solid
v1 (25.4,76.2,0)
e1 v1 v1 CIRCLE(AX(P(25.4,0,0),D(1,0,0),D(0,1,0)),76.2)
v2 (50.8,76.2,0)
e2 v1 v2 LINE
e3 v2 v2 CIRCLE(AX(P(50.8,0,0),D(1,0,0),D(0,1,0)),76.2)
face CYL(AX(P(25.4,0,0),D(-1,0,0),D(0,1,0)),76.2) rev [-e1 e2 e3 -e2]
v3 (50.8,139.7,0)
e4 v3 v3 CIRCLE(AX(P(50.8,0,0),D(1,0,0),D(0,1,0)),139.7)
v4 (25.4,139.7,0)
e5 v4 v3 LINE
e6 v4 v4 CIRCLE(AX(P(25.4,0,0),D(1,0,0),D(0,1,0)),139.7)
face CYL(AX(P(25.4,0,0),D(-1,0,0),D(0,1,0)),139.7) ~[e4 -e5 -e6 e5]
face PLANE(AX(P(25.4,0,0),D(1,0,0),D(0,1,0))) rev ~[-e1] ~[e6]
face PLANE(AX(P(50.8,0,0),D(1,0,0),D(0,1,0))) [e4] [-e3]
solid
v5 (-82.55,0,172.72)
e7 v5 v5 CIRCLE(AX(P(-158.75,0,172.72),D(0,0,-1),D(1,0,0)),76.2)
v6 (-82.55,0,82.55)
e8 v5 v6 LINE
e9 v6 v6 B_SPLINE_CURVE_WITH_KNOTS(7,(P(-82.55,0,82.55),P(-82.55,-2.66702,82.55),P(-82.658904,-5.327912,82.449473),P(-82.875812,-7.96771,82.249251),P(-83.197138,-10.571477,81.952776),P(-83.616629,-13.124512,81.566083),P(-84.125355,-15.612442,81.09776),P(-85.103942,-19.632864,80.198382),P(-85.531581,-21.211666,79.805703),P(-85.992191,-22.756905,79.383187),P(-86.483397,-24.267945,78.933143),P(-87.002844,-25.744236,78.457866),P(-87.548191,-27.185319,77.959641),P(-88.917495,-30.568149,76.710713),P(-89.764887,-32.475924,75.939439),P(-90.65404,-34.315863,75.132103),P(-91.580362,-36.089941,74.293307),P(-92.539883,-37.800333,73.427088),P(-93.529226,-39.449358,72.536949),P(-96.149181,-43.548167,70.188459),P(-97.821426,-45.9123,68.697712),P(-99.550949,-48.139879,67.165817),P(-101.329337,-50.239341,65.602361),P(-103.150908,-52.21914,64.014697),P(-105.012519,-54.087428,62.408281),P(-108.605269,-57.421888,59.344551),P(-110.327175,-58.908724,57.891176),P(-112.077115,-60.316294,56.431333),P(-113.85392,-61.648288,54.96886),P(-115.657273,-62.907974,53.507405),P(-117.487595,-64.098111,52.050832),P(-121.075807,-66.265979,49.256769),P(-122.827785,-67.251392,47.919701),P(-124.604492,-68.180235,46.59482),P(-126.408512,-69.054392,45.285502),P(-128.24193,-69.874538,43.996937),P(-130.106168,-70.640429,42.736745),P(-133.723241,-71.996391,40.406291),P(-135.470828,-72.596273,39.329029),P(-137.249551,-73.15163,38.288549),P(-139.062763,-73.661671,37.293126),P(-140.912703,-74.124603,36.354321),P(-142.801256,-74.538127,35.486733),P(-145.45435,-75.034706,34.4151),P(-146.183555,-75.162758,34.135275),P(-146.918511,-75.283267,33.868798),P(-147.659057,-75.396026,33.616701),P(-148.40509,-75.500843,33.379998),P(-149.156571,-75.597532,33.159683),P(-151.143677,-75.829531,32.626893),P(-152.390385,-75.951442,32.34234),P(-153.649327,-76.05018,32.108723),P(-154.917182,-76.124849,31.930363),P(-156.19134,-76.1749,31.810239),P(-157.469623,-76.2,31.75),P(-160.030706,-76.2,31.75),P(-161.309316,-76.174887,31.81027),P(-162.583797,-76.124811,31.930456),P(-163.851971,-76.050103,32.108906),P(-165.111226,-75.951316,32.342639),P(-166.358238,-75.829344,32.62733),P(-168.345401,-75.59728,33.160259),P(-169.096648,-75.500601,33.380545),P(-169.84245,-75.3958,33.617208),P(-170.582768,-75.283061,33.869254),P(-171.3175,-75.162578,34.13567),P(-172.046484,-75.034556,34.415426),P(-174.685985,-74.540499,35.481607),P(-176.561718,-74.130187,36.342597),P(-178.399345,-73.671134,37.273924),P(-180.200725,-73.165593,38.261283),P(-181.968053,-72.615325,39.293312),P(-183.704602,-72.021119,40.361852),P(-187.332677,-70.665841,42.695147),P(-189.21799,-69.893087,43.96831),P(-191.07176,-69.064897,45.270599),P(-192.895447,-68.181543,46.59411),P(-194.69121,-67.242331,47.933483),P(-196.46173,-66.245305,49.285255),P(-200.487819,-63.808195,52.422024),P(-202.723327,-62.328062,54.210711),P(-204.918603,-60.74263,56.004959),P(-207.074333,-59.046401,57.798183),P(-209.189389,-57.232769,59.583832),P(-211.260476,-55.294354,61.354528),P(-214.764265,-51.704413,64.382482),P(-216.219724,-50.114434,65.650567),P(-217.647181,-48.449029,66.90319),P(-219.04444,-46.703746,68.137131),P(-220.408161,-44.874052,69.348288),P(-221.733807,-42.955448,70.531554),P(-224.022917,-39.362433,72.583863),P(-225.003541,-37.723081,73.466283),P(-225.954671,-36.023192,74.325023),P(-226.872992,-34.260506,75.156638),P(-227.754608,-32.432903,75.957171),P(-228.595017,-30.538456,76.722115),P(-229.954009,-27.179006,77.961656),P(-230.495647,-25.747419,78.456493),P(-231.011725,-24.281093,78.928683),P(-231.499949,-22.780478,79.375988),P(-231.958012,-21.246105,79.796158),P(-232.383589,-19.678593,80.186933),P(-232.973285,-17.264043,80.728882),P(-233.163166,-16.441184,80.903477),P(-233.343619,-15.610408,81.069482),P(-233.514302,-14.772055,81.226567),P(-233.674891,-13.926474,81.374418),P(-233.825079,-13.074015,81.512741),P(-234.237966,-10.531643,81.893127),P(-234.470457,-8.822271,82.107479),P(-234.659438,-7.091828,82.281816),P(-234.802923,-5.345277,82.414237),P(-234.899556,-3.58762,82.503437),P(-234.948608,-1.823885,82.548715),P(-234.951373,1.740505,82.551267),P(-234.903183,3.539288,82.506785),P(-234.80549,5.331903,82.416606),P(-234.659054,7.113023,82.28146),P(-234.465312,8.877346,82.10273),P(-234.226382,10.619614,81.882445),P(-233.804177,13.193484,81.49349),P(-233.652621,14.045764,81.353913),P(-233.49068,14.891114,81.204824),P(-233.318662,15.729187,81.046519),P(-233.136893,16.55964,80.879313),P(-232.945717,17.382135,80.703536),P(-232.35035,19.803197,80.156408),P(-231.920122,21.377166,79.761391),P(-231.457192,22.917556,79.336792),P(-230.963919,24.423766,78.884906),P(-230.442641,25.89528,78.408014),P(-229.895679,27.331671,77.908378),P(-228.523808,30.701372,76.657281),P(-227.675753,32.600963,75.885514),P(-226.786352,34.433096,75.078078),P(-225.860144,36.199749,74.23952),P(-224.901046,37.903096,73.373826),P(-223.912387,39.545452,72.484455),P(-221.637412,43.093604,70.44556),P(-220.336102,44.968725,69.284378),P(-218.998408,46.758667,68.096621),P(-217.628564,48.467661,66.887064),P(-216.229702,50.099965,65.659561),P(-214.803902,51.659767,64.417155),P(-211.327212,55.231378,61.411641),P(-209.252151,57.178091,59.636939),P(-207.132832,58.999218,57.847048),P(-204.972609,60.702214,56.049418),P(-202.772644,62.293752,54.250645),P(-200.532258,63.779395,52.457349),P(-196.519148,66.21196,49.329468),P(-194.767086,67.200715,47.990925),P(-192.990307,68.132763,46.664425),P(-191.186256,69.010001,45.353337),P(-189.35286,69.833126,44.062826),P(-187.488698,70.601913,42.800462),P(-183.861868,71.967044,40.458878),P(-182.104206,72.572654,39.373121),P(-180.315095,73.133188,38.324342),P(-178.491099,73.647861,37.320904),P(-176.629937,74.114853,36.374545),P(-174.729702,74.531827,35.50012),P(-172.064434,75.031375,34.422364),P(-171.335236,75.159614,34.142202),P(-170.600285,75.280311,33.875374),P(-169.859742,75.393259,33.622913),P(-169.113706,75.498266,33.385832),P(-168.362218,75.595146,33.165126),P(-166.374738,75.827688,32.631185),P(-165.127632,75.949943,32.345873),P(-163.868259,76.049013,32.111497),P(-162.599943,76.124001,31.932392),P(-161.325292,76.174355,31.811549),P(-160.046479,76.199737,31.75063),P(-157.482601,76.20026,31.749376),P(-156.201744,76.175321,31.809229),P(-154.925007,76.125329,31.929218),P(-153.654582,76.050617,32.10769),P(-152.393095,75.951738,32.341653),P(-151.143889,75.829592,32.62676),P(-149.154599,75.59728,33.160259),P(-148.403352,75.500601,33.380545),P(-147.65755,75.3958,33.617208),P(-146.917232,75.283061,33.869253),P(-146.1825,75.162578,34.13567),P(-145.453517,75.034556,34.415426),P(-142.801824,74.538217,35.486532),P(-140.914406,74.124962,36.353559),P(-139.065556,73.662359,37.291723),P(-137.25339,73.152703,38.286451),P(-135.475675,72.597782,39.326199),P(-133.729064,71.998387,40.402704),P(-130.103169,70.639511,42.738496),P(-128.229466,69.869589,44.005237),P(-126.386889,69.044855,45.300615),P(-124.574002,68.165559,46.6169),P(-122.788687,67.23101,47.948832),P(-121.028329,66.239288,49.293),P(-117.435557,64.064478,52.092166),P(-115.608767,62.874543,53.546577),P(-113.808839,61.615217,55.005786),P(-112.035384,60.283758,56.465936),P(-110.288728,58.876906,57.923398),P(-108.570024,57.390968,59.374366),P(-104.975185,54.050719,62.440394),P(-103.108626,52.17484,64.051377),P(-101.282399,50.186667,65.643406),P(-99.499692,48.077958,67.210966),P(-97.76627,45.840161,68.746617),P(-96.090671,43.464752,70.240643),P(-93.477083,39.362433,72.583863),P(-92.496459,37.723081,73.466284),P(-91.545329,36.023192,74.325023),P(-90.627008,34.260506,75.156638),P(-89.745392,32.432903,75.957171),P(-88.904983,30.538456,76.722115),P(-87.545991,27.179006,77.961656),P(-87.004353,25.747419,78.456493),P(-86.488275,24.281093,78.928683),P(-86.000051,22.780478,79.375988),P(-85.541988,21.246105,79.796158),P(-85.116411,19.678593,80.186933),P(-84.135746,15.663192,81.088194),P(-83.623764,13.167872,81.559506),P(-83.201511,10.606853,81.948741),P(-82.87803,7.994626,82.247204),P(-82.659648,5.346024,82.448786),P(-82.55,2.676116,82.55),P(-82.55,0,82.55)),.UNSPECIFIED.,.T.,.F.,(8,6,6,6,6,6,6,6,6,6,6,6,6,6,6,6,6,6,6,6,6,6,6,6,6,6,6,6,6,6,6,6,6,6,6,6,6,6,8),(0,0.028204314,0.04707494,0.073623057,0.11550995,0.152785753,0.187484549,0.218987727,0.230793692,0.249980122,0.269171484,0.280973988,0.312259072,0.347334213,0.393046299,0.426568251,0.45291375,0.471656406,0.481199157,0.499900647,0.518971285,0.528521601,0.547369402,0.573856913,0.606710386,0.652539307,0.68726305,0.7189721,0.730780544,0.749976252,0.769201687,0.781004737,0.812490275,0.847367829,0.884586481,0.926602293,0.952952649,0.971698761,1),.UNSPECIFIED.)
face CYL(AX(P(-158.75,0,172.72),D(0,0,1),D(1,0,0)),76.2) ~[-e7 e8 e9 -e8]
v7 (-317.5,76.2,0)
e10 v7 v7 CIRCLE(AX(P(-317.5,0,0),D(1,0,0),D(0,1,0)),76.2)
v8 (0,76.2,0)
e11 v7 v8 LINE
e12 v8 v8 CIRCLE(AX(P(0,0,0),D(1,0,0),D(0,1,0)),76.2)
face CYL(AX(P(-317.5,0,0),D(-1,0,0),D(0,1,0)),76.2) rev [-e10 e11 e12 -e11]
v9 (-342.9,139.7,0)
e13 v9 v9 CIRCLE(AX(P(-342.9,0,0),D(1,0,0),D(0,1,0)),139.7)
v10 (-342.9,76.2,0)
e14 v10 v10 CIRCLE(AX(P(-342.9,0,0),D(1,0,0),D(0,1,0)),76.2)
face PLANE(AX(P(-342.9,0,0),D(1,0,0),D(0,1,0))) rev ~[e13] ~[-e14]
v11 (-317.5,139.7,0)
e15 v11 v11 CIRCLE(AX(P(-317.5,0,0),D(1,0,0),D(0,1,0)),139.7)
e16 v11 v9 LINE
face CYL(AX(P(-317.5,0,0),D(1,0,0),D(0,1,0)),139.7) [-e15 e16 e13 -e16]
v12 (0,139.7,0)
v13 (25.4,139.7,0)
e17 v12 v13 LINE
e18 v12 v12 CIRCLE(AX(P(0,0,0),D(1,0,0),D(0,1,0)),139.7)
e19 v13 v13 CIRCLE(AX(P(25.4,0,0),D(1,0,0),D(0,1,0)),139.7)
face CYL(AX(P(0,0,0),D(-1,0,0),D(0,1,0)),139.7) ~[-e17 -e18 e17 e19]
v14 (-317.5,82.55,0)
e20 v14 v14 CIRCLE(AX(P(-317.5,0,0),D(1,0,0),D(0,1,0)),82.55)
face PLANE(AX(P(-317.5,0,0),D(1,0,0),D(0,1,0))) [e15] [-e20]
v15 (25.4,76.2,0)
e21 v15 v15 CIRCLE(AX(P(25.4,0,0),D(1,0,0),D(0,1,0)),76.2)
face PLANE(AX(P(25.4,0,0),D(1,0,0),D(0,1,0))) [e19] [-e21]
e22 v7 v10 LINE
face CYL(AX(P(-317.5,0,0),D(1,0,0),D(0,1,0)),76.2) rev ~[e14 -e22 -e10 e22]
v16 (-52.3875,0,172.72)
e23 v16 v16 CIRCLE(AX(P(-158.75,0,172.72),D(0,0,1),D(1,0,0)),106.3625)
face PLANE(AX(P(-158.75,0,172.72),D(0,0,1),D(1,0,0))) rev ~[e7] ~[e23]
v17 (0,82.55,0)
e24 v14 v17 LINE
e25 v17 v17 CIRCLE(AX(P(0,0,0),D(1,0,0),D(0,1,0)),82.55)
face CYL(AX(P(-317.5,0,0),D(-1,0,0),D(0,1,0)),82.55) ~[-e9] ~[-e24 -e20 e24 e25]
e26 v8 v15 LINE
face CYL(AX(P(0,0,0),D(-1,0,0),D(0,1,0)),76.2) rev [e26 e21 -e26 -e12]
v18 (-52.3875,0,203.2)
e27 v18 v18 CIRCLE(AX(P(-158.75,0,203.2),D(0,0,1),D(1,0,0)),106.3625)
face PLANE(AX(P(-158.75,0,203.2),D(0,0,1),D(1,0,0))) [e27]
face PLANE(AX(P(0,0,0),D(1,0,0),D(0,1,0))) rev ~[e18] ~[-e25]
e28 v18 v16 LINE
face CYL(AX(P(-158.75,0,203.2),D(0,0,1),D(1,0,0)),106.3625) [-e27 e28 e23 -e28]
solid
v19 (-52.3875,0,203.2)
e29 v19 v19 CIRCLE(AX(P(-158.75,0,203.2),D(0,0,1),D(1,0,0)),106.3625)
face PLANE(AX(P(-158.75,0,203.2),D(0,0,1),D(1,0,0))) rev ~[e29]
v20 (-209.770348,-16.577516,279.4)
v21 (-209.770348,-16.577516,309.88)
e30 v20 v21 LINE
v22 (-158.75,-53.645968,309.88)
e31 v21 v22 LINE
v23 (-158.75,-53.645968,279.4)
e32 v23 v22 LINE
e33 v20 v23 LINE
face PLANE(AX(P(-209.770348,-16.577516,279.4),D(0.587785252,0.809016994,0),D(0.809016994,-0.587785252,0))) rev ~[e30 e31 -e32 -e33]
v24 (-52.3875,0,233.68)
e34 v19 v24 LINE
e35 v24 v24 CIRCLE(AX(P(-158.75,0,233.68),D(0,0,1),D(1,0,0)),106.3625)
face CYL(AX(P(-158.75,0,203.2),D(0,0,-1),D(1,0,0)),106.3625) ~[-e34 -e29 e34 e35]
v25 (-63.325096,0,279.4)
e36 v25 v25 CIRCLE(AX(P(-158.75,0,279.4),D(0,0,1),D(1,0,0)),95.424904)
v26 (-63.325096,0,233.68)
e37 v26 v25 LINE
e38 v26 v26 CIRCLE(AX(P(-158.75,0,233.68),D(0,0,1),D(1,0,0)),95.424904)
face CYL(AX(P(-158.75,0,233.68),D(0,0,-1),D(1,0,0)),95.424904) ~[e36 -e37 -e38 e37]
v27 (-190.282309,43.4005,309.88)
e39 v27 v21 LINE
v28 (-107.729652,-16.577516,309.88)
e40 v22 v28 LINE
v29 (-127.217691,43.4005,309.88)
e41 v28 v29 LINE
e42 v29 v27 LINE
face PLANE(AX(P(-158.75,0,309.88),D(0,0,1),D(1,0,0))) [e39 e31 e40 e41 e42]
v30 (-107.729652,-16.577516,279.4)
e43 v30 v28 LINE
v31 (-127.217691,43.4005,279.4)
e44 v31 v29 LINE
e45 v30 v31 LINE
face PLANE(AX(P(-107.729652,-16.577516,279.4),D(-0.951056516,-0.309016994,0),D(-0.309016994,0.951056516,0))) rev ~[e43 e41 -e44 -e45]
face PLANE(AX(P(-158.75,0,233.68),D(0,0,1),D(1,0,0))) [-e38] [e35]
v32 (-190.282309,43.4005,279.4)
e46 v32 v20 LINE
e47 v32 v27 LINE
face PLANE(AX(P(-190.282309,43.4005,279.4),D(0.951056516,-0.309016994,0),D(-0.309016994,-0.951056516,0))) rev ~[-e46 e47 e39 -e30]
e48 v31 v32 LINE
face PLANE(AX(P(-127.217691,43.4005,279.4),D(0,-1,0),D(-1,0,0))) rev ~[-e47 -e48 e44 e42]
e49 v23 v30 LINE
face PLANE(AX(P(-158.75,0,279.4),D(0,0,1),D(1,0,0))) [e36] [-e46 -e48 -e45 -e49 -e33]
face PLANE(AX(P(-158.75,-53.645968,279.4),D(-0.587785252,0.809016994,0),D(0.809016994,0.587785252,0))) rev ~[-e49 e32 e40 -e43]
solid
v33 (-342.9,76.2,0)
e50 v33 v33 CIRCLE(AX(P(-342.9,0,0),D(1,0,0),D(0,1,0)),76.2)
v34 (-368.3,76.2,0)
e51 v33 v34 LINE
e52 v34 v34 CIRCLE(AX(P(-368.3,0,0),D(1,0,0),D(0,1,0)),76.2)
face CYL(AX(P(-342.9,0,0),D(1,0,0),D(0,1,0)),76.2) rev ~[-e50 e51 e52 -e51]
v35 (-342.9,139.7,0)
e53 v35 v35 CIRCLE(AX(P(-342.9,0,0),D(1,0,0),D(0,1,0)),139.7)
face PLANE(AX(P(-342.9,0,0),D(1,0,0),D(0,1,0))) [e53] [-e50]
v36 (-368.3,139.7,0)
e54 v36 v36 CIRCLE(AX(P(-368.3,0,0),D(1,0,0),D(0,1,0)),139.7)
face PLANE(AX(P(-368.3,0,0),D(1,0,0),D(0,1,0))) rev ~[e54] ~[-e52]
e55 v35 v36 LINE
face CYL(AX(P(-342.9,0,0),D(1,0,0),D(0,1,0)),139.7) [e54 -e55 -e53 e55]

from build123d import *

# Parameters (mm, degrees)
F0_R      = 139.7
F0_R_2    = 76.2
F1_DEPTH  = 25.4
F3_R      = 139.7
F3_R_2    = 76.2
F4_DEPTH  = 25.4
F6_DEPTH  = 25.4
F7_DEPTH  = 25.4
F9_R      = 82.55
F9_R_2    = 76.2
F10_DEPTH = 317.5
F12_R     = 106.3625
F13_DEPTH = 30.48
F14_R     = 76.2
F15_REACH = 527.9471469057
F16_DEPTH = 30.48
F17_R     = 95.4249040927
F18_DEPTH = 45.72
F20_DEPTH = 30.48


with BuildPart() as f1:
    # F0 (on Right) → F1 (new body)
    with BuildSketch(Plane.YZ):
        Circle(F0_R)
        Circle(F0_R_2, mode=Mode.SUBTRACT)
    extrude(amount=F1_DEPTH)


with BuildPart() as f4:
    # F3 (on offset) → F4 (new body)
    with BuildSketch(Plane.YZ.offset(-317.5)):
        Circle(F3_R)
        Circle(F3_R_2, mode=Mode.SUBTRACT)
    extrude(amount=-F4_DEPTH)


with BuildPart() as f6:
    # F6 (new): a face of the model
    f6_faces = [f4.part.faces().sort_by_distance(p)[0] for p in [
        (-342.9, -135.7486873067, 0),
    ]]
    extrude(f6_faces, amount=F6_DEPTH)


with BuildPart() as f7:
    # F7 (new): a face of the model
    f7_faces = [f1.part.faces().sort_by_distance(p)[0] for p in [
        (25.4, -135.7486873067, 0),
    ]]
    extrude(f7_faces, amount=F7_DEPTH)


with BuildPart() as f1_1:
    add(f1.part)

    add(f4.part)  # F10 merges F4
    # F9 (on face) → F10 (join, through all)
    with BuildSketch(Plane.YZ.offset(-317.5)):
        Circle(F9_R)
        Circle(F9_R_2, mode=Mode.SUBTRACT)
    extrude(amount=F10_DEPTH)



with BuildPart() as f13:
    # F12 (on offset) → F13 (new body)
    with BuildSketch(Plane.XY.offset(203.2)):
        with Locations((-158.75, 0)):
            Circle(F12_R)
    extrude(amount=-F13_DEPTH)


with BuildPart() as f1_2:
    add(f1_1.part)

    add(f13.part)  # F15 merges F13
    f15_end = f1_2.faces().sort_by_distance((-158.75, -82.55, 0))[0]
    # F14 (on face) → F15 (join, up to a face of the model that its end follows)
    with BuildSketch(Plane(origin=(0, 0, 172.72), x_dir=(1, 0, 0), z_dir=(0, 0, -1))):
        with Locations((-158.75, 0)):
            Circle(F14_R)
    f15_long = extrude(amount=F15_REACH, mode=Mode.PRIVATE)
    add(split(f15_long, bisect_by=f15_end, keep=Keep.ALL, mode=Mode.PRIVATE).solids().sort_by_distance((-158.75, 0, 172.72))[0])


with BuildPart() as f16:
    # F16 (new): a face of the model
    f16_faces = [f1_2.part.faces().sort_by_distance(p)[0] for p in [
        (-158.75, 0, 203.2),
    ]]
    extrude(f16_faces, amount=F16_DEPTH)

    # F17 (on face) → F18 (join)
    with BuildSketch(Plane.XY.offset(233.68)):
        with Locations((-158.75, 0)):
            Circle(F17_R)
    extrude(amount=F18_DEPTH)

    # F19 (on face) → F20 (join)
    with BuildSketch(Plane.XY.offset(279.4)):
        Polygon((-127.2176910353, 43.4004999697), (-190.2823089647, 43.4004999697), (-209.7703476486, -16.5775158597), (-158.75, -53.6459682201), (-107.7296523514, -16.5775158597), align=None)
    extrude(amount=F20_DEPTH)


solid = Compound([f6.part, f7.part, f1_2.part, f16.part])
